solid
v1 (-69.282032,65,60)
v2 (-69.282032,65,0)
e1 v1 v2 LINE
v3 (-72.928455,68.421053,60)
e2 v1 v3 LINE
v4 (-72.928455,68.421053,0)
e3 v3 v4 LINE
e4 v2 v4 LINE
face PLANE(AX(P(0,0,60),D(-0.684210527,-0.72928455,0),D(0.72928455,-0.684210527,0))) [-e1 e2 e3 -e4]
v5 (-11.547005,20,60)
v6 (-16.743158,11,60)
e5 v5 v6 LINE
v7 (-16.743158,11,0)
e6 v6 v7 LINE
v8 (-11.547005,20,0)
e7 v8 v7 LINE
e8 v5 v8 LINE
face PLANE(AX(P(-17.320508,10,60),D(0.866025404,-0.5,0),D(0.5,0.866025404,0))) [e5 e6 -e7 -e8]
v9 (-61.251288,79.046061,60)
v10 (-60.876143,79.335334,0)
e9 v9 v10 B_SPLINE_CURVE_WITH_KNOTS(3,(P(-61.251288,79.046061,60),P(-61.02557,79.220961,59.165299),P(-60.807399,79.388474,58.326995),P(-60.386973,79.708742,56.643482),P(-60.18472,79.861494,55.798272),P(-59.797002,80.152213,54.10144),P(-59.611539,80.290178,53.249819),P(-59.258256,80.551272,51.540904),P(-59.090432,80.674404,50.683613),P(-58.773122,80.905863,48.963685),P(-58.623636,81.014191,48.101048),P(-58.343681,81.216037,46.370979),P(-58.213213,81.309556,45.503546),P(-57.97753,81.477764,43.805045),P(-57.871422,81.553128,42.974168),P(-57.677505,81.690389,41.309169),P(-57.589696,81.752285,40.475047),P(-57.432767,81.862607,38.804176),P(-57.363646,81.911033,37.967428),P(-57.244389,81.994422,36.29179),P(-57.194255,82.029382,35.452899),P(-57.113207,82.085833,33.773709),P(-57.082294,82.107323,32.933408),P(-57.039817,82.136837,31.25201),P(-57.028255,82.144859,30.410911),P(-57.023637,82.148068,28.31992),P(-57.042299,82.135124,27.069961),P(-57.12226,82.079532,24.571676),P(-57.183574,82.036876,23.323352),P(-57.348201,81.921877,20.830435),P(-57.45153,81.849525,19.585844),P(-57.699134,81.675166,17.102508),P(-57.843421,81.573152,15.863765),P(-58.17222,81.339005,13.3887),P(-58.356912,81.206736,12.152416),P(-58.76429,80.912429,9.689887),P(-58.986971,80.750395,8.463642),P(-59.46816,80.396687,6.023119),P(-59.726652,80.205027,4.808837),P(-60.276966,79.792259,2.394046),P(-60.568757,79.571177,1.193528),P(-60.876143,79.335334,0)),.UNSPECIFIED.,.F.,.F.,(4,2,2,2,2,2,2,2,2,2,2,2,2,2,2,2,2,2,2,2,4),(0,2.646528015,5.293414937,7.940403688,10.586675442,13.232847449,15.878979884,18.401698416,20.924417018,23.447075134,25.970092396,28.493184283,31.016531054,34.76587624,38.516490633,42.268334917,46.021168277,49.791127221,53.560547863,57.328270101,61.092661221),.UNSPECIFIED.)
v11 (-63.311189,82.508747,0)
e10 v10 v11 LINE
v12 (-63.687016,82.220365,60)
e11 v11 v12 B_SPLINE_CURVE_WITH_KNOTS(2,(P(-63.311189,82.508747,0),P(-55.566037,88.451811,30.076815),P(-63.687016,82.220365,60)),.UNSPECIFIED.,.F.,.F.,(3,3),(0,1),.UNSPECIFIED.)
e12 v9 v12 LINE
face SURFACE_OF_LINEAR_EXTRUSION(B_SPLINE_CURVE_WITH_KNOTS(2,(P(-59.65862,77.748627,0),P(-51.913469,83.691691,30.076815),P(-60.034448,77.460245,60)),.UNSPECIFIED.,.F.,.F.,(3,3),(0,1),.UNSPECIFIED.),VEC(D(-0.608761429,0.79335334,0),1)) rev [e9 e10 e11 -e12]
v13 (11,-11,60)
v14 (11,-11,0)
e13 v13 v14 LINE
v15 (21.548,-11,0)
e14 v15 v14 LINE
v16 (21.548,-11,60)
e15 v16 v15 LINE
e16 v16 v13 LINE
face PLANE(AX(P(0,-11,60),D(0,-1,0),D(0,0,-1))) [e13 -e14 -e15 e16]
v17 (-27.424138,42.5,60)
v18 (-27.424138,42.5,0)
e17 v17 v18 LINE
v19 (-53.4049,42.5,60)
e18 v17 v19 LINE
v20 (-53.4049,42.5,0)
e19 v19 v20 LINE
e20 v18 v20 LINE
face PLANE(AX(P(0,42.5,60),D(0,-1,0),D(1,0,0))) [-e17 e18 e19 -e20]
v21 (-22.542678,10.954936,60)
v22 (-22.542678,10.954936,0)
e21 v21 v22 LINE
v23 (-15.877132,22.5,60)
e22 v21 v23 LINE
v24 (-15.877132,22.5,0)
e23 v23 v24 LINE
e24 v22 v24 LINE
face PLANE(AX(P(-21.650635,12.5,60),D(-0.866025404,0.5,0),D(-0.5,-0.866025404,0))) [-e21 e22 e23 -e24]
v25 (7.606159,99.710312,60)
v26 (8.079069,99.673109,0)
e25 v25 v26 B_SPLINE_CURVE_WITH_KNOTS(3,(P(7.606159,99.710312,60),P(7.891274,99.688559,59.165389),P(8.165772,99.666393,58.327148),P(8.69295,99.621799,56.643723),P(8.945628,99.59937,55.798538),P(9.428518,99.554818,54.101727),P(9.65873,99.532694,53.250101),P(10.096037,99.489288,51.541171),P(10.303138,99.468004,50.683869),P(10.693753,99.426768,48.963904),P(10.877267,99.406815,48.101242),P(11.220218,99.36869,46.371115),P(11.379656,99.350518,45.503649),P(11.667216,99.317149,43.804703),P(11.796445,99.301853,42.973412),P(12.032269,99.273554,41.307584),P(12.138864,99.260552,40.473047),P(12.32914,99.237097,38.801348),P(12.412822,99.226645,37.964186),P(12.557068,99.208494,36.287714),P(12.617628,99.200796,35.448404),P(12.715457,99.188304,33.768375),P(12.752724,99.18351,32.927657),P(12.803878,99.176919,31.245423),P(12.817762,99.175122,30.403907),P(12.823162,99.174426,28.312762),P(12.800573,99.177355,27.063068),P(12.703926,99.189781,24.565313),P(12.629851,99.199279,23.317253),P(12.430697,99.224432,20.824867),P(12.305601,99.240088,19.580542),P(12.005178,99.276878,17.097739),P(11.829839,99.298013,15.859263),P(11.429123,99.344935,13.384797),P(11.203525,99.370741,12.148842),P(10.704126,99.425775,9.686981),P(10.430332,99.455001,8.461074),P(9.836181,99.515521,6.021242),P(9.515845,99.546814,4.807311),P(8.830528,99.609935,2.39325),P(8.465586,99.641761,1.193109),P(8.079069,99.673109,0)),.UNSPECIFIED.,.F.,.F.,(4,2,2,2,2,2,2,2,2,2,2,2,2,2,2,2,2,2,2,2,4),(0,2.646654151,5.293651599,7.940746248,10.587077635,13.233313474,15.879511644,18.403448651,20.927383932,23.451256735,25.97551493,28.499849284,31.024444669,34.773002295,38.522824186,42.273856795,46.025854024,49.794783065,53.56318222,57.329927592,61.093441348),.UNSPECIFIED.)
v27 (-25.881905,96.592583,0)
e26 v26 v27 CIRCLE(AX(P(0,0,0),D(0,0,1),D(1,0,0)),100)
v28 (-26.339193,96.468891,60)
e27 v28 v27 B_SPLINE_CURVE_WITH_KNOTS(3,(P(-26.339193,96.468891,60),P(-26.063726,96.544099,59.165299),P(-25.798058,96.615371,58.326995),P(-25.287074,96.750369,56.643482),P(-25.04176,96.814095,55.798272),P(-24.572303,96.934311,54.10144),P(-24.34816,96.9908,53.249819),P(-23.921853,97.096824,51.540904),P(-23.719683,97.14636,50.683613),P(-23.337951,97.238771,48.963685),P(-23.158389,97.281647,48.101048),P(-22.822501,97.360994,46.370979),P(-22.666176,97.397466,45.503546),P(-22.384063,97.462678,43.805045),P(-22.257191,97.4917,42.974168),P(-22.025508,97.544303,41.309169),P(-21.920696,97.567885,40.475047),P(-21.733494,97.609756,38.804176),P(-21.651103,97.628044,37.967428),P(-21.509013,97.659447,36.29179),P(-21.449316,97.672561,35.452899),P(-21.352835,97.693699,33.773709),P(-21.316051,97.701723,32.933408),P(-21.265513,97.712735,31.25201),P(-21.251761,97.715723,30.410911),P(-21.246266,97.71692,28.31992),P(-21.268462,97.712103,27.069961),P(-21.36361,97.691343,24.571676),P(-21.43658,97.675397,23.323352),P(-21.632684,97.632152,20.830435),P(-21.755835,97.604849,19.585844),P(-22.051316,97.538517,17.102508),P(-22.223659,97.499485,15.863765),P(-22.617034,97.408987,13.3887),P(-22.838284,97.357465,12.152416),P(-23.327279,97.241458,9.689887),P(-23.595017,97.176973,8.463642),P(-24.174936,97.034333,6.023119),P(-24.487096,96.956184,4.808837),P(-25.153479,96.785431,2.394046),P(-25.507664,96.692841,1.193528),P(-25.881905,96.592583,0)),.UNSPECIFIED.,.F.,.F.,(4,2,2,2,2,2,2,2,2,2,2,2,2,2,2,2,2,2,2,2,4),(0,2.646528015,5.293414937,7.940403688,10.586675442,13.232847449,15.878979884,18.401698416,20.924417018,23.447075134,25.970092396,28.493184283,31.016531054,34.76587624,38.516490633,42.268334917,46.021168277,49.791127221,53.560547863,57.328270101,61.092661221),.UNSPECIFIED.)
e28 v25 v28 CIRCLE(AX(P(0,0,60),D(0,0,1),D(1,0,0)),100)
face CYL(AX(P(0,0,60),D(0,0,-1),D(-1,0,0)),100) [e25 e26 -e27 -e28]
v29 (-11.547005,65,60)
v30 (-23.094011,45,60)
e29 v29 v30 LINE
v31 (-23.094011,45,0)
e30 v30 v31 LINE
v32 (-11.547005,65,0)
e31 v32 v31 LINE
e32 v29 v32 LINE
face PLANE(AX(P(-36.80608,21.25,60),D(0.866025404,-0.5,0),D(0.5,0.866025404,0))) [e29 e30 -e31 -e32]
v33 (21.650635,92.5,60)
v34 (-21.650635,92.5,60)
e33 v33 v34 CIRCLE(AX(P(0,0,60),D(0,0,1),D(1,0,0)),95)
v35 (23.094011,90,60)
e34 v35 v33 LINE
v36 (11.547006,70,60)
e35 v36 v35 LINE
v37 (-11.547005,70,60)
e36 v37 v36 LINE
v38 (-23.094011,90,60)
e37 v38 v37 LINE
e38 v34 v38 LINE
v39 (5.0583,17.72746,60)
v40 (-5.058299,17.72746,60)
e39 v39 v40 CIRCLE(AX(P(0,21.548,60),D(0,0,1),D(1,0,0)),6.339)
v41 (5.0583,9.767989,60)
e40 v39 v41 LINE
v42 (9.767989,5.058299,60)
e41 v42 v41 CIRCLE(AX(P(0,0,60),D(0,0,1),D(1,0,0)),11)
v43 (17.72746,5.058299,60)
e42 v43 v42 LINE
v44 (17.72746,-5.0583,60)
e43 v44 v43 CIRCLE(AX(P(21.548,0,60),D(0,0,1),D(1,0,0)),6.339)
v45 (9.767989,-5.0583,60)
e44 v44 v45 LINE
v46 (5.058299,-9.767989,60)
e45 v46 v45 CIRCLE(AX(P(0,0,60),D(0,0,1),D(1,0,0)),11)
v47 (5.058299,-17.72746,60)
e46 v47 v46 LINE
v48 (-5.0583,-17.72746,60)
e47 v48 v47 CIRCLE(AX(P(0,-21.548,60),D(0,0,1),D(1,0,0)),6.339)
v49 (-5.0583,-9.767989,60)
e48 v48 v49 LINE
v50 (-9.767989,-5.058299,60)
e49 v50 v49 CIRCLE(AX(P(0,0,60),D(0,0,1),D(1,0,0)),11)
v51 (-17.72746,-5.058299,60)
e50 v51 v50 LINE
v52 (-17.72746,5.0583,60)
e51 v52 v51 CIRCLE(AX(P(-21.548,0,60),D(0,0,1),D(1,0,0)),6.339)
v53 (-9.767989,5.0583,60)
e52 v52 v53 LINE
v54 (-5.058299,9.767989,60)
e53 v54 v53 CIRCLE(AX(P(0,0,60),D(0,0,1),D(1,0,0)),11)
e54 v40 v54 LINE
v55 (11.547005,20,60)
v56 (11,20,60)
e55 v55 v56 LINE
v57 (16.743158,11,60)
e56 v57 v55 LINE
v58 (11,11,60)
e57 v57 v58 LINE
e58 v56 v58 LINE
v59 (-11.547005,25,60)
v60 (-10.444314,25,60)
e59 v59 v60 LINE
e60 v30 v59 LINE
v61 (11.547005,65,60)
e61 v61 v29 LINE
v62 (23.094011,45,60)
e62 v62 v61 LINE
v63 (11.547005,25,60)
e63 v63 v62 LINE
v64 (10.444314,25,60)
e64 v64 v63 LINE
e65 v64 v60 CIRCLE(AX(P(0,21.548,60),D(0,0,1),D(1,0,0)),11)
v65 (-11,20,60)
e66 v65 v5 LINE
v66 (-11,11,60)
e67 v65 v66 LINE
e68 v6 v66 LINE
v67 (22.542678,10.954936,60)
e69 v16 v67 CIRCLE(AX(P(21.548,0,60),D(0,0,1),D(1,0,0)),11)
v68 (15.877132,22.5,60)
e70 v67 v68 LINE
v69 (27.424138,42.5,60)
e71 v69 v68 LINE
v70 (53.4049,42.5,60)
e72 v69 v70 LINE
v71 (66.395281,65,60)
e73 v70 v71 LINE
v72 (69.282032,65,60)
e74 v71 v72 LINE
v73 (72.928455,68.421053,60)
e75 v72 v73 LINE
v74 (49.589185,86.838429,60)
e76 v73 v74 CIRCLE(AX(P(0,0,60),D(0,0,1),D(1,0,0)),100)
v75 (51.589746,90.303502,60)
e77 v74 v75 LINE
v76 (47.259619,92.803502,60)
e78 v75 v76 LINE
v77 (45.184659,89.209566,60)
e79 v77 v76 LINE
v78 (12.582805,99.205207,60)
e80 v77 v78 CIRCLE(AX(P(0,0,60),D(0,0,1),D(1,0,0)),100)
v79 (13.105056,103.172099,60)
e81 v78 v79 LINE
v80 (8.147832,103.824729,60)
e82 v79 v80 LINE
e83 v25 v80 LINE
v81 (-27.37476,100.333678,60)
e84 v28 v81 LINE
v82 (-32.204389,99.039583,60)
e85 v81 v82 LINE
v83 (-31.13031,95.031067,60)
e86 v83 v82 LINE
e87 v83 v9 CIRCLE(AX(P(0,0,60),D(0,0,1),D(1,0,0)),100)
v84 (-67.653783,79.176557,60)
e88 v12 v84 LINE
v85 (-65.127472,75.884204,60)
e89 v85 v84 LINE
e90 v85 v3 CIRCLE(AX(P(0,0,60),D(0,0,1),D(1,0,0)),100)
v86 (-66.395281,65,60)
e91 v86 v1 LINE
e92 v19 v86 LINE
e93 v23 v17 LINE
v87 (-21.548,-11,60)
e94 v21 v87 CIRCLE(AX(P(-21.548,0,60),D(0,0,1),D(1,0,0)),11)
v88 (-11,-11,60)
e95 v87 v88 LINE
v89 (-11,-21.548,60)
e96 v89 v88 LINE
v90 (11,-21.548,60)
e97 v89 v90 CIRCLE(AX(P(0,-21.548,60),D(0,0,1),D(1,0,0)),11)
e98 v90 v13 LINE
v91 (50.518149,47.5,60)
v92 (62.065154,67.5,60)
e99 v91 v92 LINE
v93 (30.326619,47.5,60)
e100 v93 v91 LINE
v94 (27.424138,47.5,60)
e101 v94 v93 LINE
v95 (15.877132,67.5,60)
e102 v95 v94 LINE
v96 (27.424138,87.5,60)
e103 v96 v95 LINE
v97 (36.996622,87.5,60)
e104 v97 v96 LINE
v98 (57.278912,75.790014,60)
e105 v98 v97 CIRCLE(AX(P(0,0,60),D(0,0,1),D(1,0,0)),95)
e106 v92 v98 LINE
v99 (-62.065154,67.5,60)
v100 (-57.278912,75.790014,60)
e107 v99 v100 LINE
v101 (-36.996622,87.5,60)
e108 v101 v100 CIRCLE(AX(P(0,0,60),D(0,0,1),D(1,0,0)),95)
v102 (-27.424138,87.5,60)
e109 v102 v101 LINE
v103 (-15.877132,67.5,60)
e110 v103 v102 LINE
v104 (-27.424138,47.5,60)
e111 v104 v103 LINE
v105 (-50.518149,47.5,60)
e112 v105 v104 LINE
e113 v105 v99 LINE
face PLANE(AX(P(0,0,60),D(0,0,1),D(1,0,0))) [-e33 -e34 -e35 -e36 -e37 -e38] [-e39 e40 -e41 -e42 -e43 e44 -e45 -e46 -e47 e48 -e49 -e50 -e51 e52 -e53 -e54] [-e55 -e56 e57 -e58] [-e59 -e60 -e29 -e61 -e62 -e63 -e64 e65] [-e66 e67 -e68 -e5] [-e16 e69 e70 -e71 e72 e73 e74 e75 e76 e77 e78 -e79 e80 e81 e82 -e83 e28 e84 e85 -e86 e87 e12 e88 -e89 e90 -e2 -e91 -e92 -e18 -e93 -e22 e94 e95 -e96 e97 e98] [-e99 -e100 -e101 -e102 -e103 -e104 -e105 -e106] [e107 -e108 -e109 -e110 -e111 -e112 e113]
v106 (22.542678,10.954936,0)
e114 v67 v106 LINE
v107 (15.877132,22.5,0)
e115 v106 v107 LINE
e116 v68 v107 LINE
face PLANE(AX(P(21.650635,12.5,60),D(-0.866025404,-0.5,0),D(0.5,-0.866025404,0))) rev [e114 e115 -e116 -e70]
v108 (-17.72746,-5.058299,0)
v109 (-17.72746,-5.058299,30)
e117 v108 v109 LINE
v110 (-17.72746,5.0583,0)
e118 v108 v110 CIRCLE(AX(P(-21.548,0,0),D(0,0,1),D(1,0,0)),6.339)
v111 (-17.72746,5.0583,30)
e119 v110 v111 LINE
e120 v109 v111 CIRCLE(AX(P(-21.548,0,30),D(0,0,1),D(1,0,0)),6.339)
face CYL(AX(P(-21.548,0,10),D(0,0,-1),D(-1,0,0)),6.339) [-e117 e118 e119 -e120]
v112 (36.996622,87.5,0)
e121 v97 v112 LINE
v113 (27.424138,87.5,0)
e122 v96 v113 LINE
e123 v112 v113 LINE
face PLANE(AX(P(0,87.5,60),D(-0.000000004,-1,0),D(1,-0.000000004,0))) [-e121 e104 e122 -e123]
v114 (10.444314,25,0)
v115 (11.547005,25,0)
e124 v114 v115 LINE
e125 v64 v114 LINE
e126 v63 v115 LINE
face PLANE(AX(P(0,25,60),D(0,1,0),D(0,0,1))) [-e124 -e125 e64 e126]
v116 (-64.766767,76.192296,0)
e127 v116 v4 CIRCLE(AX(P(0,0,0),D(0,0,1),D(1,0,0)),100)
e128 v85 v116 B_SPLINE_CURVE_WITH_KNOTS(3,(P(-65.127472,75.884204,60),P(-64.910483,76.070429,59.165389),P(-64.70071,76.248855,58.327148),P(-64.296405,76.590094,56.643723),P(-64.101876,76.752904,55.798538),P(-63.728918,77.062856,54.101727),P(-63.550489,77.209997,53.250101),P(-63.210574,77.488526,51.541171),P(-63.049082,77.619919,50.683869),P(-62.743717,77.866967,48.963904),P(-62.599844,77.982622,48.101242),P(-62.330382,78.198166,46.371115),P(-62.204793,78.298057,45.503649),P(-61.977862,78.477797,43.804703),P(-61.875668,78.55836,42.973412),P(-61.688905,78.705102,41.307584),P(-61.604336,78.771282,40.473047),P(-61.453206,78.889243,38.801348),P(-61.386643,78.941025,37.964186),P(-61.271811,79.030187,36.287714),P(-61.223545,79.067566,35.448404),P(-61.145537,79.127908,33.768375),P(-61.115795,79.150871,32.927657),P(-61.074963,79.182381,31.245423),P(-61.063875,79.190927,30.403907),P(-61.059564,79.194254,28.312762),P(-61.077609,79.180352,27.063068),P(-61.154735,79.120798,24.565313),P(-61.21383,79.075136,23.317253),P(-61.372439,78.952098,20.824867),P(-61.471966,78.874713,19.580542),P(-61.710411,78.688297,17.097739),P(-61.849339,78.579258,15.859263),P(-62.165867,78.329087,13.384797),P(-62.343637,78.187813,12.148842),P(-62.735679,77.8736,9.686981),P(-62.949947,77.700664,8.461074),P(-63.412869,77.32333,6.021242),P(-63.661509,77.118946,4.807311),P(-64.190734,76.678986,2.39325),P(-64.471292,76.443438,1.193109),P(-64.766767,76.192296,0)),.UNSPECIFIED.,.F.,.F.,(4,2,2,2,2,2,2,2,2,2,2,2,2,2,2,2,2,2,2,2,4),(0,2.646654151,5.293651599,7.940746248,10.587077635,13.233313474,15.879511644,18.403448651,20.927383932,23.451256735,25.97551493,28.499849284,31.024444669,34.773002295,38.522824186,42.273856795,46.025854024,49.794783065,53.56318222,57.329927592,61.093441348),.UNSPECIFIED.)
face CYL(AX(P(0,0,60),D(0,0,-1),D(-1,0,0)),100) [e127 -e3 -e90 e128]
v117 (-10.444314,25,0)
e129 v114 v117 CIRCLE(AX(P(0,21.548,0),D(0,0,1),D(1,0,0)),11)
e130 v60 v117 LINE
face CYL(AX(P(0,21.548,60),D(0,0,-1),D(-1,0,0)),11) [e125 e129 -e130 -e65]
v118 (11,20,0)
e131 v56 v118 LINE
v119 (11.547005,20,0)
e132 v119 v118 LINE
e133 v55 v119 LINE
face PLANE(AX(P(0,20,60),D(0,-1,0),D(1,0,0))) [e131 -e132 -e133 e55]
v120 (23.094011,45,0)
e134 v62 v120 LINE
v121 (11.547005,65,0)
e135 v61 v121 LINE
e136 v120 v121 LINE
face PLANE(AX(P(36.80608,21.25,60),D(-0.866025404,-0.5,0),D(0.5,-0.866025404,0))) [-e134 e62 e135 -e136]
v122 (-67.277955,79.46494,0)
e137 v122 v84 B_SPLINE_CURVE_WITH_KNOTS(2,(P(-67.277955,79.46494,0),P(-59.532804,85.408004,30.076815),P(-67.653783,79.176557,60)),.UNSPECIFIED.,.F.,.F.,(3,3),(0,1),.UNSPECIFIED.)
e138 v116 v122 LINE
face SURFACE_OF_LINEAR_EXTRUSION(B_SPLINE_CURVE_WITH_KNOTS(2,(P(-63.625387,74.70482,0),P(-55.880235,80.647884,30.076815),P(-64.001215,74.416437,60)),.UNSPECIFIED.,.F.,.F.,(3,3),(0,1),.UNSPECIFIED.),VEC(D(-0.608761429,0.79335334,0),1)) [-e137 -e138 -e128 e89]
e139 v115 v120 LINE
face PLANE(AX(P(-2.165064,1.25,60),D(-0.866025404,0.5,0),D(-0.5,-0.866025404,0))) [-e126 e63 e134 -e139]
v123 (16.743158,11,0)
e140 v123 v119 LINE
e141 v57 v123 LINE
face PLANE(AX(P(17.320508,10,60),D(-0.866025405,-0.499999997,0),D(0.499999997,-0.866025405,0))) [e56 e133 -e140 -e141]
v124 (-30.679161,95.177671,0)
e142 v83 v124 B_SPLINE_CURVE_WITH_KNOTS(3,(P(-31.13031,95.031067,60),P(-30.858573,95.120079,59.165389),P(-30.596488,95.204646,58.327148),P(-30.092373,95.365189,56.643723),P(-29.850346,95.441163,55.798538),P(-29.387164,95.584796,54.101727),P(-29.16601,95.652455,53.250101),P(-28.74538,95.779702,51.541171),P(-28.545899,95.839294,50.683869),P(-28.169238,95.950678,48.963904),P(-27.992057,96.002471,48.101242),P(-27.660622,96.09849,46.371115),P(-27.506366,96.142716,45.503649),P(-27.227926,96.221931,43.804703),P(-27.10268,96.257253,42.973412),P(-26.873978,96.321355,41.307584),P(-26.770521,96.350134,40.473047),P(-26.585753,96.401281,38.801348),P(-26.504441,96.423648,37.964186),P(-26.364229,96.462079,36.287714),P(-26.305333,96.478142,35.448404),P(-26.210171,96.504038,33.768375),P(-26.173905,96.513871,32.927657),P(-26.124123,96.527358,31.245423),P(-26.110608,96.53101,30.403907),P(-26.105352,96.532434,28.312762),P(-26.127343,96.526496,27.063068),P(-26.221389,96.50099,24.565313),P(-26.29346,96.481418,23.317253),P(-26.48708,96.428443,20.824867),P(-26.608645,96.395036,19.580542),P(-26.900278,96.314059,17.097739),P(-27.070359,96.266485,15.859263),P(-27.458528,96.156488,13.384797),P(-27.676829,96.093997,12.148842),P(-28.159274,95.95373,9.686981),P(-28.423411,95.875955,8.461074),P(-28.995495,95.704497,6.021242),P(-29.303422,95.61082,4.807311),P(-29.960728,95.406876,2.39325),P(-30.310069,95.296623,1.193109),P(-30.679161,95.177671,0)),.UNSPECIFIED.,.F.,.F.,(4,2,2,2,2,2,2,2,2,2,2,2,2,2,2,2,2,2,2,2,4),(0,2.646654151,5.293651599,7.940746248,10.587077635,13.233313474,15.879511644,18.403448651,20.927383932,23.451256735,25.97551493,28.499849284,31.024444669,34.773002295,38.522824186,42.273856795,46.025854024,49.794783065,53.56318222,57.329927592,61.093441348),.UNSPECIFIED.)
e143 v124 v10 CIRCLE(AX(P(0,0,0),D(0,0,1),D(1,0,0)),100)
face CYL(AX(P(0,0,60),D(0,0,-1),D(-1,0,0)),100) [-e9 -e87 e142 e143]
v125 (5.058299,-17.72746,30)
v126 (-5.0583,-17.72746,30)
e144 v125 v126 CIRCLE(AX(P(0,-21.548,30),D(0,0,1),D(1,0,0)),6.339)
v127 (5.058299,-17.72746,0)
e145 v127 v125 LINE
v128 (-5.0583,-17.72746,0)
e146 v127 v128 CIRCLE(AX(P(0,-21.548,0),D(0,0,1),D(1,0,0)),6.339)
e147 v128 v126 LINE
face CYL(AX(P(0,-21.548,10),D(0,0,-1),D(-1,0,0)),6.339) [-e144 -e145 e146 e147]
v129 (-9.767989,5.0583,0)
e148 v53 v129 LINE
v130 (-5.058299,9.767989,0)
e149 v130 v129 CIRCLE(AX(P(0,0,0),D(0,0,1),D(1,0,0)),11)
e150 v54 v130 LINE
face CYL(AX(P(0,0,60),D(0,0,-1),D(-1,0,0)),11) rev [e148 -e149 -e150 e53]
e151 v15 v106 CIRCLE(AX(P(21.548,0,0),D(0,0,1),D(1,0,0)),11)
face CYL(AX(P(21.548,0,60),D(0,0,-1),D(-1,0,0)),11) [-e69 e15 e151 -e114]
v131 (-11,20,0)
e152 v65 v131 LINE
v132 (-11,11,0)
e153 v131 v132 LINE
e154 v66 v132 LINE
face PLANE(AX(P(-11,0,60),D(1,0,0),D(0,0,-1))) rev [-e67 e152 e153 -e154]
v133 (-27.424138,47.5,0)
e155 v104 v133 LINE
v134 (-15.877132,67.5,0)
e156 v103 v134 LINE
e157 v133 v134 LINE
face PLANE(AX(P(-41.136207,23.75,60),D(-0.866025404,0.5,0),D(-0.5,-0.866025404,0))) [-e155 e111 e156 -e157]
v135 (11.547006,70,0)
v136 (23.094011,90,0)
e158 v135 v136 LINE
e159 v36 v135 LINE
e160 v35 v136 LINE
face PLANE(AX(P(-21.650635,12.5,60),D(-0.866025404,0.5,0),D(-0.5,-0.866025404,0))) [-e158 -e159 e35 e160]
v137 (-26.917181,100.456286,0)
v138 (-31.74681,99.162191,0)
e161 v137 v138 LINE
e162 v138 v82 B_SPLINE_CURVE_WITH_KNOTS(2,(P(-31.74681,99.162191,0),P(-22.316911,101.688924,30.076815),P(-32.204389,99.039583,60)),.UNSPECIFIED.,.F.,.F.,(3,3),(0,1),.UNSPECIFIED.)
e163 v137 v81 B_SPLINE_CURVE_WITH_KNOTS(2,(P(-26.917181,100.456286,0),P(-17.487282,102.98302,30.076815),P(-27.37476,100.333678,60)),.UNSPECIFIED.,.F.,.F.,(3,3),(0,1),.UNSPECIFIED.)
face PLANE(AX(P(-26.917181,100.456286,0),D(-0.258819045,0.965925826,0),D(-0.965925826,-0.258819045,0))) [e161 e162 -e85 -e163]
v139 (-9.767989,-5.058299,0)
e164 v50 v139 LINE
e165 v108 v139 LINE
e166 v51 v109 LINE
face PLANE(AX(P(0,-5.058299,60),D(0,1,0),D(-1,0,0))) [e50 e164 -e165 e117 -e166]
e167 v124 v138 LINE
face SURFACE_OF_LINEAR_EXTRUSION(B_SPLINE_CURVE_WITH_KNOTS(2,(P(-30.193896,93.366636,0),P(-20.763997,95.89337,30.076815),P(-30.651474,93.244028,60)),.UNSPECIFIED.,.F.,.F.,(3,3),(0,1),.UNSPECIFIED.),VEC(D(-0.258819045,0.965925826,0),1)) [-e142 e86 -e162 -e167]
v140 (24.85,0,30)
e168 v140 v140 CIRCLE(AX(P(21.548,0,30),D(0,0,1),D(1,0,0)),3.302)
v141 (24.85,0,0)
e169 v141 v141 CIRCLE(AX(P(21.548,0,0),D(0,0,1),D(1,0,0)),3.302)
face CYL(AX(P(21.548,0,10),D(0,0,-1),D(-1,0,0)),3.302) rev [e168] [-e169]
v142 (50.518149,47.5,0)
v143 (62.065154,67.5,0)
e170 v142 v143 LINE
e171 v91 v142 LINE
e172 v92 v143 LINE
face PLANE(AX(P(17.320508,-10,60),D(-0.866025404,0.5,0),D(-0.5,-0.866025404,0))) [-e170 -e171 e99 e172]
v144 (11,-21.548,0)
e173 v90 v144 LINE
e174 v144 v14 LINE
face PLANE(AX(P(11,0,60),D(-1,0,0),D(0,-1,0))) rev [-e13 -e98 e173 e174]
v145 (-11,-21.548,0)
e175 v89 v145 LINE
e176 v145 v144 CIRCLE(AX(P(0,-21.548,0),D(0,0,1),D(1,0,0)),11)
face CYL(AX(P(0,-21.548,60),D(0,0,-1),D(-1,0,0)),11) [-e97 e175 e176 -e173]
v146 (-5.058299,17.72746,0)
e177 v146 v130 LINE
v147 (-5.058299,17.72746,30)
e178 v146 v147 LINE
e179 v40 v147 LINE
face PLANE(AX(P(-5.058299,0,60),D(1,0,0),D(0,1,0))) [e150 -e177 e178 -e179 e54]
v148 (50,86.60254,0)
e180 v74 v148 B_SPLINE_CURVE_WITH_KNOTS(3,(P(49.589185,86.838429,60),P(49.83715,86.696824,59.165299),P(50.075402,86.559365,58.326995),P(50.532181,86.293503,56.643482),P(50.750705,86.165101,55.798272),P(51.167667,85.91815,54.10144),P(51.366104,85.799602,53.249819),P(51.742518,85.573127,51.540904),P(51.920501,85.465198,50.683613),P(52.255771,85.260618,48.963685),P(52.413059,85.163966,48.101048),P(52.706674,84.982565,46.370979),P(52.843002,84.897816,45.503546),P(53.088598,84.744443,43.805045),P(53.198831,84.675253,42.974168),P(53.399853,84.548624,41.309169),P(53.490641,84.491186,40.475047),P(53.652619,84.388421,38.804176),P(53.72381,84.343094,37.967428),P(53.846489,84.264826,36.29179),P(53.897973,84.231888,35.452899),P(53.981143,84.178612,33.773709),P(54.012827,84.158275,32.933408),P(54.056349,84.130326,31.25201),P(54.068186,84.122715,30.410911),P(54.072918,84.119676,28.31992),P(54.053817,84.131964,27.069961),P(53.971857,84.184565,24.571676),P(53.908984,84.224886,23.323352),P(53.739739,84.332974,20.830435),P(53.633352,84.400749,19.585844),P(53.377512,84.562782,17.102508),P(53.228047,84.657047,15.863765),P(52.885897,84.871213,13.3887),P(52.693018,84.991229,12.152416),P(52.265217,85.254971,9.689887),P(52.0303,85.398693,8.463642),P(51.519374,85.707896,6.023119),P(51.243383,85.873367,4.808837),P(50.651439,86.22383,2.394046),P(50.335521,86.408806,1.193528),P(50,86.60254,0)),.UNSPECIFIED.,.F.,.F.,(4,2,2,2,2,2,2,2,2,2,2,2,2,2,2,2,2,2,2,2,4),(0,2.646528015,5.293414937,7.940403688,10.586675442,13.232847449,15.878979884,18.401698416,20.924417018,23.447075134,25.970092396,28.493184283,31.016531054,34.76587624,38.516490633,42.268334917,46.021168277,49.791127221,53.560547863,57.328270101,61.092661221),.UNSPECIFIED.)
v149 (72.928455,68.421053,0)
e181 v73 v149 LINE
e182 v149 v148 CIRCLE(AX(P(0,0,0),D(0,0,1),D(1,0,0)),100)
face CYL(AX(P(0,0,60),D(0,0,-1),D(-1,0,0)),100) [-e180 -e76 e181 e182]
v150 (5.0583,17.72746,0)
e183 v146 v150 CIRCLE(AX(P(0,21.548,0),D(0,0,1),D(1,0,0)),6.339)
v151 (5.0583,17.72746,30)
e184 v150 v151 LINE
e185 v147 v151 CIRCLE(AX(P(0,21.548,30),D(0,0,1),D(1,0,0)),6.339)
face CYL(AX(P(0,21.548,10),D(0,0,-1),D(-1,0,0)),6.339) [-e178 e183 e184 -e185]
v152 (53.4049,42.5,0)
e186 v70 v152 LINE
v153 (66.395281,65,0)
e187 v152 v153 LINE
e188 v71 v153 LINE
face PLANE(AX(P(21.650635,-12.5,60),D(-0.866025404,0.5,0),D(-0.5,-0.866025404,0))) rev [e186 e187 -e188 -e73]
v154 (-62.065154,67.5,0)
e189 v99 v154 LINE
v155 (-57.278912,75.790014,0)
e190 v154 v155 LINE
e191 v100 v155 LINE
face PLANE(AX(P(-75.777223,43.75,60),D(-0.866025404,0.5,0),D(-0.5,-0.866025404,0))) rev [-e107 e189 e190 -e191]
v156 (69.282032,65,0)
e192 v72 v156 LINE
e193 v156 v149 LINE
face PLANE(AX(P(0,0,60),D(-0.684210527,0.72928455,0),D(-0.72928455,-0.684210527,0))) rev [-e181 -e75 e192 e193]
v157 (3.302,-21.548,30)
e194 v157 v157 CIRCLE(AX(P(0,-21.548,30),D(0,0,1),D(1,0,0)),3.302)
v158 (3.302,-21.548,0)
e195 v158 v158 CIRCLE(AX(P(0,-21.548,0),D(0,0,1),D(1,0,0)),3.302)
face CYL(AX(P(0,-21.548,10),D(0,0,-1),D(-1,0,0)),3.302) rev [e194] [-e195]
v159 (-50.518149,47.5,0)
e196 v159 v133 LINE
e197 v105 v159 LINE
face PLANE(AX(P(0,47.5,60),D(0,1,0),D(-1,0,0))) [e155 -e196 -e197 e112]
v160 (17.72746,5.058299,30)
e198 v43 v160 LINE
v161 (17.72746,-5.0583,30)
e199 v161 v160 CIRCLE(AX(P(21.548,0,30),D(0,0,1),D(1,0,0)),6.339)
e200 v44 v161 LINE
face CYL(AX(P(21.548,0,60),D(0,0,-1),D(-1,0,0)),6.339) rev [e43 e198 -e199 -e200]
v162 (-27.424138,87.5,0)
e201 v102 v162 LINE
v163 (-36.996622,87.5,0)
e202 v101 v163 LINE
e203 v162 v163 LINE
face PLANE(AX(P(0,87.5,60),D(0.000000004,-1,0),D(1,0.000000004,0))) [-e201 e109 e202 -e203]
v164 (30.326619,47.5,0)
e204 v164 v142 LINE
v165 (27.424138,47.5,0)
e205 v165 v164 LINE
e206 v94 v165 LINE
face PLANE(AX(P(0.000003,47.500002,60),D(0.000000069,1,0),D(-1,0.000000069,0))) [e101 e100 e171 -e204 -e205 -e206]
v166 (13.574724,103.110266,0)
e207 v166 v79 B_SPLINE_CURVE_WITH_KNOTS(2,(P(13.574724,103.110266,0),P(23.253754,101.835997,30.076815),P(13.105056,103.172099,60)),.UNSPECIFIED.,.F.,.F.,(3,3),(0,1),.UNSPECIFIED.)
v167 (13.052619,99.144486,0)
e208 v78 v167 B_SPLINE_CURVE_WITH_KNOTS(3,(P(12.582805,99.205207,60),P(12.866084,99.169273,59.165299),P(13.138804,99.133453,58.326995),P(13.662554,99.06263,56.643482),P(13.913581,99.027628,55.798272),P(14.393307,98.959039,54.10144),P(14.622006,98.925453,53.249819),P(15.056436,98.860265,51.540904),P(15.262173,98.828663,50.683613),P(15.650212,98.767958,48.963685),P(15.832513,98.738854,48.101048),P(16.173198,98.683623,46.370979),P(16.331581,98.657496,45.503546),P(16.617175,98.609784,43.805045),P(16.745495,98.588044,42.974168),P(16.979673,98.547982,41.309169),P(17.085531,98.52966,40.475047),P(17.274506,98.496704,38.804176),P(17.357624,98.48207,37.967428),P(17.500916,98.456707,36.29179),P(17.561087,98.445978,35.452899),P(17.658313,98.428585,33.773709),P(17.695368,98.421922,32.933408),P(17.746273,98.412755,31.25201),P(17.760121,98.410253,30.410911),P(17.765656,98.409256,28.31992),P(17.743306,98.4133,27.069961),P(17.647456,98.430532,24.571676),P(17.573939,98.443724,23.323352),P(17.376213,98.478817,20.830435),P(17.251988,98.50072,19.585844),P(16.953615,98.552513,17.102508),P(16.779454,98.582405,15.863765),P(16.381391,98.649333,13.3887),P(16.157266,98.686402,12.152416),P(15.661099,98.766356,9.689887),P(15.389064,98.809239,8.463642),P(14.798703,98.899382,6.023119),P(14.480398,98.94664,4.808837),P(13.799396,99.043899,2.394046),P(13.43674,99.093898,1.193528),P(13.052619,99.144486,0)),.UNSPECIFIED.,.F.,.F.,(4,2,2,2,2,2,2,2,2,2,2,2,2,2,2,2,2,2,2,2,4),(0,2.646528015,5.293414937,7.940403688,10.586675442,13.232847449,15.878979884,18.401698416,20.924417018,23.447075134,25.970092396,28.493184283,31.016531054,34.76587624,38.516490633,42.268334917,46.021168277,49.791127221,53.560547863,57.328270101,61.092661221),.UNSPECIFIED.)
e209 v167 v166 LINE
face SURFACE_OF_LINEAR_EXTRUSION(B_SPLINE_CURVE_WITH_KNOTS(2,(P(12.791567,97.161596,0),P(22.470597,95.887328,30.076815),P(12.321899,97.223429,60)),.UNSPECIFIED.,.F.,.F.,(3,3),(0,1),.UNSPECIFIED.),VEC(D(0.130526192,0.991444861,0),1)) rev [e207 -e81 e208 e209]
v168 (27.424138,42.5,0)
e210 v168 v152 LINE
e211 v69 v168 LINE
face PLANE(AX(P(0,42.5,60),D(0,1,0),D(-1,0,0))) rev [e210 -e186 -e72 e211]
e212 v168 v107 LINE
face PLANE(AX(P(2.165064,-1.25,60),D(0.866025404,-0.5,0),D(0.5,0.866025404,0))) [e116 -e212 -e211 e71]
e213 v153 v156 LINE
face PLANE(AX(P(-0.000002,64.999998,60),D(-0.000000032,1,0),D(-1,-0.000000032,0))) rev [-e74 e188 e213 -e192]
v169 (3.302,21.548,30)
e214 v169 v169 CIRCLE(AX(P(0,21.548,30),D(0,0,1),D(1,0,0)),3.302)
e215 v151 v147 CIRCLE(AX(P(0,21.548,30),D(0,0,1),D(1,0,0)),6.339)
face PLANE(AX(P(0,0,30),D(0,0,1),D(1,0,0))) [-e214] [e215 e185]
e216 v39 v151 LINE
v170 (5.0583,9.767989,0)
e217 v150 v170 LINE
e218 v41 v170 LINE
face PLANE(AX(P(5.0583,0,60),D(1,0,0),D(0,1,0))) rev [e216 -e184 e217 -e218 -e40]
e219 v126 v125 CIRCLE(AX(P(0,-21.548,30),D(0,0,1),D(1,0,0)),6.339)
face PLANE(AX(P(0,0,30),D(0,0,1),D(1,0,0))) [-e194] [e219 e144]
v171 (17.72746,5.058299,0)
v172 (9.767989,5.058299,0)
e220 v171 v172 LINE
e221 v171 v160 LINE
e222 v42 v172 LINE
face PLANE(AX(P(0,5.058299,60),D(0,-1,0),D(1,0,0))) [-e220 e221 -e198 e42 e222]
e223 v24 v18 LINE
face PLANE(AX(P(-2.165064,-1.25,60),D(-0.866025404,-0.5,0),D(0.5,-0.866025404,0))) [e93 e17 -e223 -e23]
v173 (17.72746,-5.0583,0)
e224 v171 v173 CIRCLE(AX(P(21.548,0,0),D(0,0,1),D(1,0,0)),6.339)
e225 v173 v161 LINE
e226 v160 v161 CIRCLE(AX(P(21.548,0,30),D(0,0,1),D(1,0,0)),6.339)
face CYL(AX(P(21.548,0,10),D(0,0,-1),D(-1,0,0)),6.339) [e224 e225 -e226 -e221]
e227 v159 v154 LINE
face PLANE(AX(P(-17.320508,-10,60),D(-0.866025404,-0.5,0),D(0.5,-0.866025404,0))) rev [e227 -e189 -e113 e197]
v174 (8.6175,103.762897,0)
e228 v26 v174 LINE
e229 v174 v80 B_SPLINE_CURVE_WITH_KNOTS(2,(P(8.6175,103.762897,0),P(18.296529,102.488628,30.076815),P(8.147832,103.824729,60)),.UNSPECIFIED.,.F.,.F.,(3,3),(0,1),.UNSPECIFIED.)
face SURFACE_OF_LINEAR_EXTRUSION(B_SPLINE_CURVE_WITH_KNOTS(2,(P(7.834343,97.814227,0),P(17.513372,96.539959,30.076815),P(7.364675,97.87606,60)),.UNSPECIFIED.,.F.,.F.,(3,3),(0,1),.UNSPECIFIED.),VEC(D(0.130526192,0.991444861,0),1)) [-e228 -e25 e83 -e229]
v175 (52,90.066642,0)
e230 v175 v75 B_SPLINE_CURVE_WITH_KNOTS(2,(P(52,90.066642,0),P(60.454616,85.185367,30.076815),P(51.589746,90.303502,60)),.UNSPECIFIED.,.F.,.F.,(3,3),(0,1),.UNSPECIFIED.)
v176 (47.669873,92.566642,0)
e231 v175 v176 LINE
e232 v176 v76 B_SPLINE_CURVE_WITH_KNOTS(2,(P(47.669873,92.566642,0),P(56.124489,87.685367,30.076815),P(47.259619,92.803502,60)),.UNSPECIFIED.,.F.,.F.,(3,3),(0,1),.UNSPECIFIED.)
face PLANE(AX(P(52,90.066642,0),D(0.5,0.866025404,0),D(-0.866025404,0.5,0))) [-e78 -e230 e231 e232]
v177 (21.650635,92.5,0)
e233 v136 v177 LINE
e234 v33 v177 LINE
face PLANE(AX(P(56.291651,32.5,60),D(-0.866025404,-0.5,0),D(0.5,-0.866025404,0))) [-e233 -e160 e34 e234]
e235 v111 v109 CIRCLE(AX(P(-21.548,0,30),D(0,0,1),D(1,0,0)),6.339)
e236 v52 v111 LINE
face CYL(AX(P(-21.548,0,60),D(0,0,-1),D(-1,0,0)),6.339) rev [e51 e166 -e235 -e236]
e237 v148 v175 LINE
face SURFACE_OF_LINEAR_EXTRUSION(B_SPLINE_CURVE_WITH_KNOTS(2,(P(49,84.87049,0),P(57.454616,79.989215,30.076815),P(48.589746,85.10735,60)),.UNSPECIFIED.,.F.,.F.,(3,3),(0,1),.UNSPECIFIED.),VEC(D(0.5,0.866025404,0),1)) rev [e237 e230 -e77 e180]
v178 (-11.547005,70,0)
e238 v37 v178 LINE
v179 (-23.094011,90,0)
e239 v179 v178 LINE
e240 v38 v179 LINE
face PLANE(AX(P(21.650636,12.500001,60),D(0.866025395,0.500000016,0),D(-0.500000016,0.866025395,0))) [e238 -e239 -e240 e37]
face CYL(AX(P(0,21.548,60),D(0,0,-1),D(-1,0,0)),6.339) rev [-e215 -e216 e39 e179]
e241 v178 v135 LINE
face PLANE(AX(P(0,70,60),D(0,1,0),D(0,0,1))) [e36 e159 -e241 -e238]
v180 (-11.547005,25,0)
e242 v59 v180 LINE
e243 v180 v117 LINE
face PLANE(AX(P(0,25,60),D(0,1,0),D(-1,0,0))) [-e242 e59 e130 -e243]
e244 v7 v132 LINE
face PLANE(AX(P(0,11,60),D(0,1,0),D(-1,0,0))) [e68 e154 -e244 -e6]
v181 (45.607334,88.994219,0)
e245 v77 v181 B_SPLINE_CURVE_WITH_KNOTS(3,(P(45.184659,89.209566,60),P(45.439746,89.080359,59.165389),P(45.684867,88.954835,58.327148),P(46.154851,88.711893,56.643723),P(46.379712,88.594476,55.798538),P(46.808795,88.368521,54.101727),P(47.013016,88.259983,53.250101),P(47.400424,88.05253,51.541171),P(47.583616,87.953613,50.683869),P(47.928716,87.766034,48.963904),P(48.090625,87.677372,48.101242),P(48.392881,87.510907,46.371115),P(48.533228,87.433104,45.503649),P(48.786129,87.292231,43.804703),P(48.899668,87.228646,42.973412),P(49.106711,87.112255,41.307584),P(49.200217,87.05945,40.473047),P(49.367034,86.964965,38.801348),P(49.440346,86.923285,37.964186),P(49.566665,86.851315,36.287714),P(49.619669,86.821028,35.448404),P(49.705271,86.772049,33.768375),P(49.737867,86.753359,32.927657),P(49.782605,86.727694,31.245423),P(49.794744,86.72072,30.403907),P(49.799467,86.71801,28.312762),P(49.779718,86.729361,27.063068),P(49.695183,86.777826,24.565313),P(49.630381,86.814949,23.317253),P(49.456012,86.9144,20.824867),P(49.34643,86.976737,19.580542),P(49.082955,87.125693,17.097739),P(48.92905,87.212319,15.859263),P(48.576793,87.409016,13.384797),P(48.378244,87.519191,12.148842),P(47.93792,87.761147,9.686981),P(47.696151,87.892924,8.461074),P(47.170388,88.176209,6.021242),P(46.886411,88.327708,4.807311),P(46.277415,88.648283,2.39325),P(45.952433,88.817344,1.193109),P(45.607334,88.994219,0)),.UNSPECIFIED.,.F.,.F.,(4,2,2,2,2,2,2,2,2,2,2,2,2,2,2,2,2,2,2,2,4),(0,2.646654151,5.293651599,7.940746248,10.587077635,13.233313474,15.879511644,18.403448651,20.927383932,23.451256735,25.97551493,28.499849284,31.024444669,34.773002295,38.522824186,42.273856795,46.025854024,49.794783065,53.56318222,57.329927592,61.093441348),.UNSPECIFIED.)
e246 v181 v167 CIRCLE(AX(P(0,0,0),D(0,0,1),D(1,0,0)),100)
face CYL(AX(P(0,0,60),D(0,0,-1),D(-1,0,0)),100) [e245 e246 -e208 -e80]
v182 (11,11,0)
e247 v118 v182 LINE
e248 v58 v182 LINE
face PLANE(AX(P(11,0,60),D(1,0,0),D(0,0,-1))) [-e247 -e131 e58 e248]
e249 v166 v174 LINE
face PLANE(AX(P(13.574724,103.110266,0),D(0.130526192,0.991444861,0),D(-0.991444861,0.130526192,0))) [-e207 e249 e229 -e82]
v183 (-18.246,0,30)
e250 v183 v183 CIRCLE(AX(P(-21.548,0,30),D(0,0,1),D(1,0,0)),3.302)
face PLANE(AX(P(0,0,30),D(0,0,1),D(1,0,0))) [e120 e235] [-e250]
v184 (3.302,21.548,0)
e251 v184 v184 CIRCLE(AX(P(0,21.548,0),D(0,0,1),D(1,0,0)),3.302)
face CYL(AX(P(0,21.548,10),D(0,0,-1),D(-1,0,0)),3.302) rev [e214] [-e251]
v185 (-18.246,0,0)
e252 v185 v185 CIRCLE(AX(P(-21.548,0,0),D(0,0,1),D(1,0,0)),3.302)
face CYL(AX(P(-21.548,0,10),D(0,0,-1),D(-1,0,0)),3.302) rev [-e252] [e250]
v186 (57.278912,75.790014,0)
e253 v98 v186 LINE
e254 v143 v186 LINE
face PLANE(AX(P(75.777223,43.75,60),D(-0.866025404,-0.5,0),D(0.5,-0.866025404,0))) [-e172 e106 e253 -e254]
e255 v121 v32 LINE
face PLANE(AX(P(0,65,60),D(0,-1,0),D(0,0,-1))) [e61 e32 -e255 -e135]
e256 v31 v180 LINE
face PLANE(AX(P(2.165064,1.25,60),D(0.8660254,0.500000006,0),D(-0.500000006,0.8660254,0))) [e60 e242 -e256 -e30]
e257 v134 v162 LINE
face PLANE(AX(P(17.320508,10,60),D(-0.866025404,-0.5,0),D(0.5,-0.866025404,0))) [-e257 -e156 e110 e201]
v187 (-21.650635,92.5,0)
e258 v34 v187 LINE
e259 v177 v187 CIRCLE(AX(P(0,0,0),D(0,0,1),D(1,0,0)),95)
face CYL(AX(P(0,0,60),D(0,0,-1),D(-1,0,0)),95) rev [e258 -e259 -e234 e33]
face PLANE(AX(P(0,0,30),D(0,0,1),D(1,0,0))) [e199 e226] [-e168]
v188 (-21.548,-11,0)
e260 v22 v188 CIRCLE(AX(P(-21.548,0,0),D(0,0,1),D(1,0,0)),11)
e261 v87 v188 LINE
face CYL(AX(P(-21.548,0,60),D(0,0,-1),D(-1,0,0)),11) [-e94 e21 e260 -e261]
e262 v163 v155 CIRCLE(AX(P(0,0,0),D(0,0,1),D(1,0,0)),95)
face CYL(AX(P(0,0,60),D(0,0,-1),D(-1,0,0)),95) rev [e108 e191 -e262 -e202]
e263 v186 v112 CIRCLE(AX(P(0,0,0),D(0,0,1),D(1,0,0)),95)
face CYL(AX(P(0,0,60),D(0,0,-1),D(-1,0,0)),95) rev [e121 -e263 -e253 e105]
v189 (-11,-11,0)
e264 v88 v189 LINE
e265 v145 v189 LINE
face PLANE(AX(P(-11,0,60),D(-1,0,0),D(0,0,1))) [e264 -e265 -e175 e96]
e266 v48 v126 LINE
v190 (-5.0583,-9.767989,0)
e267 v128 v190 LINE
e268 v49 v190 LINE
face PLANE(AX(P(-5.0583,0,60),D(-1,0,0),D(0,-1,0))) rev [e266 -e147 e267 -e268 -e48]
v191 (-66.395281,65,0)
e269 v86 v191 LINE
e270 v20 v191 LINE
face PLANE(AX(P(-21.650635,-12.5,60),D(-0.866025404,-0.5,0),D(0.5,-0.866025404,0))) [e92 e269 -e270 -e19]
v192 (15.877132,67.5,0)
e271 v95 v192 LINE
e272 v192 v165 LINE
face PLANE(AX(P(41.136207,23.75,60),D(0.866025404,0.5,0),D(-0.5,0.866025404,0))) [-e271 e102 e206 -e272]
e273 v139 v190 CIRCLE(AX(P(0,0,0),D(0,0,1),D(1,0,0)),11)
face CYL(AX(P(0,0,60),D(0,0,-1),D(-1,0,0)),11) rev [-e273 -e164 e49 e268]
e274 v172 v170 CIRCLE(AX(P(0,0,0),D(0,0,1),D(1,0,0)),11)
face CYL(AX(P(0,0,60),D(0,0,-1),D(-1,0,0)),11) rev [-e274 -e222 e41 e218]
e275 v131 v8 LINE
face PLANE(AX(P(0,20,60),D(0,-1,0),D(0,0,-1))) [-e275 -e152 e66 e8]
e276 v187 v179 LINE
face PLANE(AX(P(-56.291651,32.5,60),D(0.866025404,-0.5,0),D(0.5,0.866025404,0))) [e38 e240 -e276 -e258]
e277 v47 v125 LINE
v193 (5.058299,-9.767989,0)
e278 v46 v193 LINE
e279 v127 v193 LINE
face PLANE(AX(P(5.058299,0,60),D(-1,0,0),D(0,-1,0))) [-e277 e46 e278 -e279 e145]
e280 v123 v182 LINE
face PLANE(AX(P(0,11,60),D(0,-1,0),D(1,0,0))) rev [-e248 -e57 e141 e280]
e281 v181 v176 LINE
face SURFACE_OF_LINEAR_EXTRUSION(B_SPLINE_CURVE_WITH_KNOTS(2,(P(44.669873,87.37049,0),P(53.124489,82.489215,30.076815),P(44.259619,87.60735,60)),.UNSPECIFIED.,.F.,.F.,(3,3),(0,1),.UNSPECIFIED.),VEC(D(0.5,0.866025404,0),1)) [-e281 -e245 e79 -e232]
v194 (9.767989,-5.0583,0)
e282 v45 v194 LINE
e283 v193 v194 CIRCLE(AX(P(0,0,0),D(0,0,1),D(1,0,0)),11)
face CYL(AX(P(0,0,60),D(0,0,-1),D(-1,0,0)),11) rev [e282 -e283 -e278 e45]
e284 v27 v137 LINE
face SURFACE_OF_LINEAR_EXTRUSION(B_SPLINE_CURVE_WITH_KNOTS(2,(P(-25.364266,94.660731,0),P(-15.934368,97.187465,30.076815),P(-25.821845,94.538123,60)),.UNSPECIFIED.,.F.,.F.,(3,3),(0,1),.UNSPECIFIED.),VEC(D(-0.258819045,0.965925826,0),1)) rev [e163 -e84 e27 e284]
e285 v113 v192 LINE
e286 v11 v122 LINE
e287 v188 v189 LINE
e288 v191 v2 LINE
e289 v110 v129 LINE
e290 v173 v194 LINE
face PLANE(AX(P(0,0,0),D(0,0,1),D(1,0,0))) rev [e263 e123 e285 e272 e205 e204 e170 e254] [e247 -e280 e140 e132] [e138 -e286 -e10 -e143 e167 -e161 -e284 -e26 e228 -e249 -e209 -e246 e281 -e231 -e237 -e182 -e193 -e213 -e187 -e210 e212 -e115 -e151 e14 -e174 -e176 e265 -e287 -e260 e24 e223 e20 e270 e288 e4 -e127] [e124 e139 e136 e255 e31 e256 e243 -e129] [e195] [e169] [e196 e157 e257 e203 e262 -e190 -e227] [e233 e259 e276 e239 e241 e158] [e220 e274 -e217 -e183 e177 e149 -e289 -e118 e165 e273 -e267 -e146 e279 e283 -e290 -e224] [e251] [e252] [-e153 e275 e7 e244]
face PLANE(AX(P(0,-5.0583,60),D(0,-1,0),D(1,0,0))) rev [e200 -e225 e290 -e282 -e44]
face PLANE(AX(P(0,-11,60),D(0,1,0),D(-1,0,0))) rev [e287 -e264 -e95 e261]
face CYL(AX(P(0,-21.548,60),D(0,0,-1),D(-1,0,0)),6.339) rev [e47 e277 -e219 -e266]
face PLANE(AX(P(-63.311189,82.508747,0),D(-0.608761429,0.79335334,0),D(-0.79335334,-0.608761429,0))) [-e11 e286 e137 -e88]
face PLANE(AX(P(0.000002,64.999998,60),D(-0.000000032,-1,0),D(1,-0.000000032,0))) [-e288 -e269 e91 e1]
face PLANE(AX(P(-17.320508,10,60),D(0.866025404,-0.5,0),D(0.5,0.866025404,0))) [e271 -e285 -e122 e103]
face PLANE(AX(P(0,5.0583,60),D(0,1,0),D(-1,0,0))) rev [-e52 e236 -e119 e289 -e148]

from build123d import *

# Parameters (mm, degrees)
BOSS_EXTRUDE1_DEPTH = 60
SKETCH1_4_R         = 6.338999997
SKETCH1_4_R_2       = 3.302
SKETCH1_4_R_3       = 3.301999997
BOSS_EXTRUDE2_DEPTH = 10
SKETCH1_6_R         = 6.338999997
SKETCH1_6_R_2       = 3.301999997
SKETCH1_6_R_3       = 3.302
BOSS_EXTRUDE4_DEPTH = 30
BOSS_EXTRUDE5_DEPTH = 60
BOSS_EXTRUDE6_START = -2
BOSS_EXTRUDE6_DEPTH = 6
CIRPATTERN3_COUNT   = 16


# Read off the part's stored shape, not the designer's step: Boss-Extrude1
with BuildPart() as part:
    # Boss-Extrude1 outline → Boss-Extrude1 (new body)
    with BuildSketch(Plane.XY):
        with BuildLine():
            Line((-27.424137764, 42.49999995), (-15.877132386, 22.499999959))
            Line((-15.877132386, 22.499999959), (-22.542678391, 10.954935617))
            ThreePointArc((-22.542678391, 10.954935617), (-32.536728065, -0.49784941), (-21.547999925, -11.00000003))
            Line((-21.547999925, -11.00000003), (-10.999999983, -11.00000003))
            Line((-10.999999983, -11.00000003), (-10.999999983, -21.547999949))
            ThreePointArc((-10.999999983, -21.547999949), (2.4e-08, -32.547999956), (11.00000003, -21.547999949))
            Line((11.00000003, -21.547999949), (11.00000003, -11.000000006))
            Line((11.00000003, -11.000000006), (21.547999949, -11.000000006))
            ThreePointArc((21.547999949, -11.000000006), (32.53672809, -0.497849376), (22.542678394, 10.954935643))
            Line((22.542678394, 10.954935643), (15.877132386, 22.499999959))
            Line((15.877132386, 22.499999959), (27.424137764, 42.49999995))
            Line((27.424137764, 42.49999995), (53.404899911, 42.49999995))
            Line((53.404899911, 42.49999995), (66.39528096, 64.999999935))
            Line((66.39528096, 64.999999935), (69.282032276, 65.000000028))
            ThreePointArc((69.282032276, 65.000000028), (63.510032668, 70.650376861), (57.278911905, 75.79001419))
            Line((57.278911905, 75.79001419), (62.0651539, 67.499999879))
            Line((62.0651539, 67.499999879), (50.518148521, 47.499999888))
            Line((50.518148521, 47.499999888), (27.42413776, 47.499999896))
            Line((27.42413776, 47.499999896), (15.877132386, 67.499999879))
            Line((15.877132386, 67.499999879), (27.424137764, 87.49999987))
            Line((27.424137764, 87.49999987), (36.996621947, 87.499999797))
            ThreePointArc((36.996621947, 87.499999797), (29.430004911, 90.326490085), (21.650635056, 92.500000009))
            Line((21.650635056, 92.500000009), (23.094010837, 89.999999729))
            Line((23.094010837, 89.999999729), (11.547005507, 69.999999822))
            Line((11.547005507, 69.999999822), (-11.547004687, 69.999999822))
            Line((-11.547004687, 69.999999822), (-23.094010614, 89.999999911))
            Line((-23.094010614, 89.999999911), (-21.650634856, 92.500000056))
            ThreePointArc((-21.650634856, 92.500000056), (-29.430004813, 90.326490116), (-36.996621947, 87.499999797))
            Line((-36.996621947, 87.499999797), (-27.424137764, 87.49999987))
            Line((-27.424137764, 87.49999987), (-15.877132386, 67.499999879))
            Line((-15.877132386, 67.499999879), (-27.424137764, 47.499999888))
            Line((-27.424137764, 47.499999888), (-50.518148521, 47.499999888))
            Line((-50.518148521, 47.499999888), (-62.0651539, 67.499999879))
            Line((-62.0651539, 67.499999879), (-57.278911905, 75.79001419))
            ThreePointArc((-57.278911905, 75.79001419), (-63.510032668, 70.650376861), (-69.282032276, 65.000000028))
            Line((-69.282032276, 65.000000028), (-66.39528096, 64.999999935))
            Line((-66.39528096, 64.999999935), (-53.404899911, 42.49999995))
            Line((-53.404899911, 42.49999995), (-27.424137764, 42.49999995))
        make_face()
        Polygon((-11.000000006, 19.999999941), (-11.000000006, 10.999999983), (-16.743157748, 10.999999983), (-11.54700535, 19.999999941), align=None, mode=Mode.SUBTRACT)
        with BuildLine():
            Line((-9.767988869, -5.058299477), (-17.727459778, -5.058299515))
            ThreePointArc((-17.727459778, -5.058299515), (-27.88699994, -4.1e-08), (-17.727459815, 5.058299508))
            Line((-17.727459815, 5.058299508), (-9.767988835, 5.058299543))
            ThreePointArc((-9.767988835, 5.058299543), (-7.778174571, 7.778174624), (-5.058299477, 9.767988869))
            Line((-5.058299477, 9.767988869), (-5.058299513, 17.727459781))
            ThreePointArc((-5.058299513, 17.727459781), (-1.2e-08, 27.886999922), (5.058299528, 17.7274598))
            Line((5.058299528, 17.7274598), (5.058299543, 9.767988835))
            ThreePointArc((5.058299543, 9.767988835), (7.778174624, 7.778174571), (9.767988869, 5.058299477))
            Line((9.767988869, 5.058299477), (17.727459795, 5.058299493))
            ThreePointArc((17.727459795, 5.058299493), (27.88699994, -1.5e-08), (17.727459798, -5.05829953))
            Line((17.727459798, -5.05829953), (9.767988835, -5.058299543))
            ThreePointArc((9.767988835, -5.058299543), (7.778174571, -7.778174624), (5.058299477, -9.767988869))
            Line((5.058299477, -9.767988869), (5.058299496, -17.727459793))
            ThreePointArc((5.058299496, -17.727459793), (1.3e-08, -27.886999957), (-5.058299511, -17.727459813))
            Line((-5.058299511, -17.727459813), (-5.058299543, -9.767988835))
            ThreePointArc((-5.058299543, -9.767988835), (-7.778174624, -7.778174571), (-9.767988869, -5.058299477))
        make_face(mode=Mode.SUBTRACT)
        Polygon((16.743157694, 11.000000006), (11.000000006, 11.000000006), (11.000000006, 19.999999941), (11.54700535, 19.999999941), align=None, mode=Mode.SUBTRACT)
        with BuildLine():
            Line((23.094010708, 44.999999885), (11.547005356, 24.999999941))
            Line((11.547005356, 24.999999941), (10.444314053, 24.999999941))
            ThreePointArc((10.444314053, 24.999999941), (0, 32.547999932), (-10.444314053, 24.999999941))
            Line((-10.444314053, 24.999999941), (-11.547005099, 24.999999941))
            Line((-11.547005099, 24.999999941), (-23.094010665, 44.999999941))
            Line((-23.094010665, 44.999999941), (-11.54700535, 64.999999822))
            Line((-11.54700535, 64.999999822), (11.54700535, 64.999999822))
            Line((11.54700535, 64.999999822), (23.094010708, 44.999999885))
        make_face(mode=Mode.SUBTRACT)
    extrude(amount=BOSS_EXTRUDE1_DEPTH)

    # Sketch1<4> → Boss-Extrude2 (add)
    # profile 1 of 4: a face of its own
    with BuildSketch(Plane.XY):
        with Locations((0, 21.547999925)):
            Circle(SKETCH1_4_R)
        with Locations((0, 21.547999925)):
            Circle(SKETCH1_4_R_2, mode=Mode.SUBTRACT)
    # profile 2 of 4: a face of its own
    with BuildSketch(Plane.XY):
        with Locations((21.547999943, -1.7e-08)):
            Circle(SKETCH1_4_R)
        with Locations((21.547999974, -2.6e-08)):
            Circle(SKETCH1_4_R_2, mode=Mode.SUBTRACT)
    # profile 3 of 4: a face of its own
    with BuildSketch(Plane.XY):
        with Locations((-21.547999943, -1.7e-08)):
            Circle(SKETCH1_4_R)
        with Locations((-21.547999951, -4.8e-08)):
            Circle(SKETCH1_4_R_2, mode=Mode.SUBTRACT)
    # profile 4 of 4: a face of its own
    with BuildSketch(Plane.XY):
        with Locations((0, -21.54799996)):
            Circle(SKETCH1_4_R)
        with Locations((2.3e-08, -21.547999999)):
            Circle(SKETCH1_4_R_3, mode=Mode.SUBTRACT)
    extrude(amount=BOSS_EXTRUDE2_DEPTH)

    # Sketch1<6> → Boss-Extrude4 (add)
    # profile 1 of 4: a face of its own
    with BuildSketch(Plane.XY):
        with Locations((0, -21.54799996)):
            Circle(SKETCH1_6_R)
        with Locations((2.3e-08, -21.547999999)):
            Circle(SKETCH1_6_R_2, mode=Mode.SUBTRACT)
    # profile 2 of 4: a face of its own
    with BuildSketch(Plane.XY):
        with Locations((-21.547999943, -1.7e-08)):
            Circle(SKETCH1_6_R)
        with Locations((-21.547999951, -4.8e-08)):
            Circle(SKETCH1_6_R_3, mode=Mode.SUBTRACT)
    # profile 3 of 4: a face of its own
    with BuildSketch(Plane.XY):
        with Locations((21.547999943, -1.7e-08)):
            Circle(SKETCH1_6_R)
        with Locations((21.547999974, -2.6e-08)):
            Circle(SKETCH1_6_R_3, mode=Mode.SUBTRACT)
    # profile 4 of 4: a face of its own
    with BuildSketch(Plane.XY):
        with Locations((0, 21.547999925)):
            Circle(SKETCH1_6_R)
        with Locations((0, 21.547999925)):
            Circle(SKETCH1_6_R_3, mode=Mode.SUBTRACT)
    extrude(amount=BOSS_EXTRUDE4_DEPTH)

    # Sketch1<7> → Boss-Extrude5 (add)
    with BuildSketch(Plane.XY):
        with BuildLine():
            Line((-69.282032276, 65.000000028), (-72.928455025, 68.421052659))
            ThreePointArc((-72.928455025, 68.421052659), (0, 99.999999996), (72.928455025, 68.421052659))
            Line((72.928455025, 68.421052659), (69.282032276, 65.000000028))
            ThreePointArc((69.282032276, 65.000000028), (0, 95), (-69.282032276, 65.000000028))
        make_face()
    extrude(amount=BOSS_EXTRUDE5_DEPTH)

    # Sketch2 → Boss-Extrude6 (add)
    with BuildSketch(Plane(origin=(49.999999998, 86.602540375, 0), x_dir=(0.866025403784439, -0.4999999999999993, 0), z_dir=(0.4999999999999993, 0.866025403784439, 0)).offset(BOSS_EXTRUDE6_START)):
        with BuildLine():
            Line((0, 0), (-5, 0))
            add(Edge.make_bspline(
                [(-5, 0), (4.762549661, -30.076815137), (-5.473720523, -60)],
                knots=[0, 0, 0, 1, 1, 1], degree=2))
            Line((-5.473720523, -60), (-0.473720523, -60))
            add(Edge.make_bspline(
                [(0, 0), (9.762549647, -30.076815137), (-0.473720523, -60)],
                knots=[0, 0, 0, 1, 1, 1], degree=2))
        make_face()
    boss_extrude6 = extrude(amount=BOSS_EXTRUDE6_DEPTH)

    # CirPattern3: Boss-Extrude6 ×16 about axis, 12 skipped
    cirpattern3_axis = Axis((0, 0, 0), (0, 0, -1))
    add([boss_extrude6.rotate(cirpattern3_axis, i * 360 / CIRPATTERN3_COUNT) for i in range(1, CIRPATTERN3_COUNT) if i not in (1, 2, 3, 4, 5, 6, 7, 8, 9, 10, 11, 12)])


solid = part.part
